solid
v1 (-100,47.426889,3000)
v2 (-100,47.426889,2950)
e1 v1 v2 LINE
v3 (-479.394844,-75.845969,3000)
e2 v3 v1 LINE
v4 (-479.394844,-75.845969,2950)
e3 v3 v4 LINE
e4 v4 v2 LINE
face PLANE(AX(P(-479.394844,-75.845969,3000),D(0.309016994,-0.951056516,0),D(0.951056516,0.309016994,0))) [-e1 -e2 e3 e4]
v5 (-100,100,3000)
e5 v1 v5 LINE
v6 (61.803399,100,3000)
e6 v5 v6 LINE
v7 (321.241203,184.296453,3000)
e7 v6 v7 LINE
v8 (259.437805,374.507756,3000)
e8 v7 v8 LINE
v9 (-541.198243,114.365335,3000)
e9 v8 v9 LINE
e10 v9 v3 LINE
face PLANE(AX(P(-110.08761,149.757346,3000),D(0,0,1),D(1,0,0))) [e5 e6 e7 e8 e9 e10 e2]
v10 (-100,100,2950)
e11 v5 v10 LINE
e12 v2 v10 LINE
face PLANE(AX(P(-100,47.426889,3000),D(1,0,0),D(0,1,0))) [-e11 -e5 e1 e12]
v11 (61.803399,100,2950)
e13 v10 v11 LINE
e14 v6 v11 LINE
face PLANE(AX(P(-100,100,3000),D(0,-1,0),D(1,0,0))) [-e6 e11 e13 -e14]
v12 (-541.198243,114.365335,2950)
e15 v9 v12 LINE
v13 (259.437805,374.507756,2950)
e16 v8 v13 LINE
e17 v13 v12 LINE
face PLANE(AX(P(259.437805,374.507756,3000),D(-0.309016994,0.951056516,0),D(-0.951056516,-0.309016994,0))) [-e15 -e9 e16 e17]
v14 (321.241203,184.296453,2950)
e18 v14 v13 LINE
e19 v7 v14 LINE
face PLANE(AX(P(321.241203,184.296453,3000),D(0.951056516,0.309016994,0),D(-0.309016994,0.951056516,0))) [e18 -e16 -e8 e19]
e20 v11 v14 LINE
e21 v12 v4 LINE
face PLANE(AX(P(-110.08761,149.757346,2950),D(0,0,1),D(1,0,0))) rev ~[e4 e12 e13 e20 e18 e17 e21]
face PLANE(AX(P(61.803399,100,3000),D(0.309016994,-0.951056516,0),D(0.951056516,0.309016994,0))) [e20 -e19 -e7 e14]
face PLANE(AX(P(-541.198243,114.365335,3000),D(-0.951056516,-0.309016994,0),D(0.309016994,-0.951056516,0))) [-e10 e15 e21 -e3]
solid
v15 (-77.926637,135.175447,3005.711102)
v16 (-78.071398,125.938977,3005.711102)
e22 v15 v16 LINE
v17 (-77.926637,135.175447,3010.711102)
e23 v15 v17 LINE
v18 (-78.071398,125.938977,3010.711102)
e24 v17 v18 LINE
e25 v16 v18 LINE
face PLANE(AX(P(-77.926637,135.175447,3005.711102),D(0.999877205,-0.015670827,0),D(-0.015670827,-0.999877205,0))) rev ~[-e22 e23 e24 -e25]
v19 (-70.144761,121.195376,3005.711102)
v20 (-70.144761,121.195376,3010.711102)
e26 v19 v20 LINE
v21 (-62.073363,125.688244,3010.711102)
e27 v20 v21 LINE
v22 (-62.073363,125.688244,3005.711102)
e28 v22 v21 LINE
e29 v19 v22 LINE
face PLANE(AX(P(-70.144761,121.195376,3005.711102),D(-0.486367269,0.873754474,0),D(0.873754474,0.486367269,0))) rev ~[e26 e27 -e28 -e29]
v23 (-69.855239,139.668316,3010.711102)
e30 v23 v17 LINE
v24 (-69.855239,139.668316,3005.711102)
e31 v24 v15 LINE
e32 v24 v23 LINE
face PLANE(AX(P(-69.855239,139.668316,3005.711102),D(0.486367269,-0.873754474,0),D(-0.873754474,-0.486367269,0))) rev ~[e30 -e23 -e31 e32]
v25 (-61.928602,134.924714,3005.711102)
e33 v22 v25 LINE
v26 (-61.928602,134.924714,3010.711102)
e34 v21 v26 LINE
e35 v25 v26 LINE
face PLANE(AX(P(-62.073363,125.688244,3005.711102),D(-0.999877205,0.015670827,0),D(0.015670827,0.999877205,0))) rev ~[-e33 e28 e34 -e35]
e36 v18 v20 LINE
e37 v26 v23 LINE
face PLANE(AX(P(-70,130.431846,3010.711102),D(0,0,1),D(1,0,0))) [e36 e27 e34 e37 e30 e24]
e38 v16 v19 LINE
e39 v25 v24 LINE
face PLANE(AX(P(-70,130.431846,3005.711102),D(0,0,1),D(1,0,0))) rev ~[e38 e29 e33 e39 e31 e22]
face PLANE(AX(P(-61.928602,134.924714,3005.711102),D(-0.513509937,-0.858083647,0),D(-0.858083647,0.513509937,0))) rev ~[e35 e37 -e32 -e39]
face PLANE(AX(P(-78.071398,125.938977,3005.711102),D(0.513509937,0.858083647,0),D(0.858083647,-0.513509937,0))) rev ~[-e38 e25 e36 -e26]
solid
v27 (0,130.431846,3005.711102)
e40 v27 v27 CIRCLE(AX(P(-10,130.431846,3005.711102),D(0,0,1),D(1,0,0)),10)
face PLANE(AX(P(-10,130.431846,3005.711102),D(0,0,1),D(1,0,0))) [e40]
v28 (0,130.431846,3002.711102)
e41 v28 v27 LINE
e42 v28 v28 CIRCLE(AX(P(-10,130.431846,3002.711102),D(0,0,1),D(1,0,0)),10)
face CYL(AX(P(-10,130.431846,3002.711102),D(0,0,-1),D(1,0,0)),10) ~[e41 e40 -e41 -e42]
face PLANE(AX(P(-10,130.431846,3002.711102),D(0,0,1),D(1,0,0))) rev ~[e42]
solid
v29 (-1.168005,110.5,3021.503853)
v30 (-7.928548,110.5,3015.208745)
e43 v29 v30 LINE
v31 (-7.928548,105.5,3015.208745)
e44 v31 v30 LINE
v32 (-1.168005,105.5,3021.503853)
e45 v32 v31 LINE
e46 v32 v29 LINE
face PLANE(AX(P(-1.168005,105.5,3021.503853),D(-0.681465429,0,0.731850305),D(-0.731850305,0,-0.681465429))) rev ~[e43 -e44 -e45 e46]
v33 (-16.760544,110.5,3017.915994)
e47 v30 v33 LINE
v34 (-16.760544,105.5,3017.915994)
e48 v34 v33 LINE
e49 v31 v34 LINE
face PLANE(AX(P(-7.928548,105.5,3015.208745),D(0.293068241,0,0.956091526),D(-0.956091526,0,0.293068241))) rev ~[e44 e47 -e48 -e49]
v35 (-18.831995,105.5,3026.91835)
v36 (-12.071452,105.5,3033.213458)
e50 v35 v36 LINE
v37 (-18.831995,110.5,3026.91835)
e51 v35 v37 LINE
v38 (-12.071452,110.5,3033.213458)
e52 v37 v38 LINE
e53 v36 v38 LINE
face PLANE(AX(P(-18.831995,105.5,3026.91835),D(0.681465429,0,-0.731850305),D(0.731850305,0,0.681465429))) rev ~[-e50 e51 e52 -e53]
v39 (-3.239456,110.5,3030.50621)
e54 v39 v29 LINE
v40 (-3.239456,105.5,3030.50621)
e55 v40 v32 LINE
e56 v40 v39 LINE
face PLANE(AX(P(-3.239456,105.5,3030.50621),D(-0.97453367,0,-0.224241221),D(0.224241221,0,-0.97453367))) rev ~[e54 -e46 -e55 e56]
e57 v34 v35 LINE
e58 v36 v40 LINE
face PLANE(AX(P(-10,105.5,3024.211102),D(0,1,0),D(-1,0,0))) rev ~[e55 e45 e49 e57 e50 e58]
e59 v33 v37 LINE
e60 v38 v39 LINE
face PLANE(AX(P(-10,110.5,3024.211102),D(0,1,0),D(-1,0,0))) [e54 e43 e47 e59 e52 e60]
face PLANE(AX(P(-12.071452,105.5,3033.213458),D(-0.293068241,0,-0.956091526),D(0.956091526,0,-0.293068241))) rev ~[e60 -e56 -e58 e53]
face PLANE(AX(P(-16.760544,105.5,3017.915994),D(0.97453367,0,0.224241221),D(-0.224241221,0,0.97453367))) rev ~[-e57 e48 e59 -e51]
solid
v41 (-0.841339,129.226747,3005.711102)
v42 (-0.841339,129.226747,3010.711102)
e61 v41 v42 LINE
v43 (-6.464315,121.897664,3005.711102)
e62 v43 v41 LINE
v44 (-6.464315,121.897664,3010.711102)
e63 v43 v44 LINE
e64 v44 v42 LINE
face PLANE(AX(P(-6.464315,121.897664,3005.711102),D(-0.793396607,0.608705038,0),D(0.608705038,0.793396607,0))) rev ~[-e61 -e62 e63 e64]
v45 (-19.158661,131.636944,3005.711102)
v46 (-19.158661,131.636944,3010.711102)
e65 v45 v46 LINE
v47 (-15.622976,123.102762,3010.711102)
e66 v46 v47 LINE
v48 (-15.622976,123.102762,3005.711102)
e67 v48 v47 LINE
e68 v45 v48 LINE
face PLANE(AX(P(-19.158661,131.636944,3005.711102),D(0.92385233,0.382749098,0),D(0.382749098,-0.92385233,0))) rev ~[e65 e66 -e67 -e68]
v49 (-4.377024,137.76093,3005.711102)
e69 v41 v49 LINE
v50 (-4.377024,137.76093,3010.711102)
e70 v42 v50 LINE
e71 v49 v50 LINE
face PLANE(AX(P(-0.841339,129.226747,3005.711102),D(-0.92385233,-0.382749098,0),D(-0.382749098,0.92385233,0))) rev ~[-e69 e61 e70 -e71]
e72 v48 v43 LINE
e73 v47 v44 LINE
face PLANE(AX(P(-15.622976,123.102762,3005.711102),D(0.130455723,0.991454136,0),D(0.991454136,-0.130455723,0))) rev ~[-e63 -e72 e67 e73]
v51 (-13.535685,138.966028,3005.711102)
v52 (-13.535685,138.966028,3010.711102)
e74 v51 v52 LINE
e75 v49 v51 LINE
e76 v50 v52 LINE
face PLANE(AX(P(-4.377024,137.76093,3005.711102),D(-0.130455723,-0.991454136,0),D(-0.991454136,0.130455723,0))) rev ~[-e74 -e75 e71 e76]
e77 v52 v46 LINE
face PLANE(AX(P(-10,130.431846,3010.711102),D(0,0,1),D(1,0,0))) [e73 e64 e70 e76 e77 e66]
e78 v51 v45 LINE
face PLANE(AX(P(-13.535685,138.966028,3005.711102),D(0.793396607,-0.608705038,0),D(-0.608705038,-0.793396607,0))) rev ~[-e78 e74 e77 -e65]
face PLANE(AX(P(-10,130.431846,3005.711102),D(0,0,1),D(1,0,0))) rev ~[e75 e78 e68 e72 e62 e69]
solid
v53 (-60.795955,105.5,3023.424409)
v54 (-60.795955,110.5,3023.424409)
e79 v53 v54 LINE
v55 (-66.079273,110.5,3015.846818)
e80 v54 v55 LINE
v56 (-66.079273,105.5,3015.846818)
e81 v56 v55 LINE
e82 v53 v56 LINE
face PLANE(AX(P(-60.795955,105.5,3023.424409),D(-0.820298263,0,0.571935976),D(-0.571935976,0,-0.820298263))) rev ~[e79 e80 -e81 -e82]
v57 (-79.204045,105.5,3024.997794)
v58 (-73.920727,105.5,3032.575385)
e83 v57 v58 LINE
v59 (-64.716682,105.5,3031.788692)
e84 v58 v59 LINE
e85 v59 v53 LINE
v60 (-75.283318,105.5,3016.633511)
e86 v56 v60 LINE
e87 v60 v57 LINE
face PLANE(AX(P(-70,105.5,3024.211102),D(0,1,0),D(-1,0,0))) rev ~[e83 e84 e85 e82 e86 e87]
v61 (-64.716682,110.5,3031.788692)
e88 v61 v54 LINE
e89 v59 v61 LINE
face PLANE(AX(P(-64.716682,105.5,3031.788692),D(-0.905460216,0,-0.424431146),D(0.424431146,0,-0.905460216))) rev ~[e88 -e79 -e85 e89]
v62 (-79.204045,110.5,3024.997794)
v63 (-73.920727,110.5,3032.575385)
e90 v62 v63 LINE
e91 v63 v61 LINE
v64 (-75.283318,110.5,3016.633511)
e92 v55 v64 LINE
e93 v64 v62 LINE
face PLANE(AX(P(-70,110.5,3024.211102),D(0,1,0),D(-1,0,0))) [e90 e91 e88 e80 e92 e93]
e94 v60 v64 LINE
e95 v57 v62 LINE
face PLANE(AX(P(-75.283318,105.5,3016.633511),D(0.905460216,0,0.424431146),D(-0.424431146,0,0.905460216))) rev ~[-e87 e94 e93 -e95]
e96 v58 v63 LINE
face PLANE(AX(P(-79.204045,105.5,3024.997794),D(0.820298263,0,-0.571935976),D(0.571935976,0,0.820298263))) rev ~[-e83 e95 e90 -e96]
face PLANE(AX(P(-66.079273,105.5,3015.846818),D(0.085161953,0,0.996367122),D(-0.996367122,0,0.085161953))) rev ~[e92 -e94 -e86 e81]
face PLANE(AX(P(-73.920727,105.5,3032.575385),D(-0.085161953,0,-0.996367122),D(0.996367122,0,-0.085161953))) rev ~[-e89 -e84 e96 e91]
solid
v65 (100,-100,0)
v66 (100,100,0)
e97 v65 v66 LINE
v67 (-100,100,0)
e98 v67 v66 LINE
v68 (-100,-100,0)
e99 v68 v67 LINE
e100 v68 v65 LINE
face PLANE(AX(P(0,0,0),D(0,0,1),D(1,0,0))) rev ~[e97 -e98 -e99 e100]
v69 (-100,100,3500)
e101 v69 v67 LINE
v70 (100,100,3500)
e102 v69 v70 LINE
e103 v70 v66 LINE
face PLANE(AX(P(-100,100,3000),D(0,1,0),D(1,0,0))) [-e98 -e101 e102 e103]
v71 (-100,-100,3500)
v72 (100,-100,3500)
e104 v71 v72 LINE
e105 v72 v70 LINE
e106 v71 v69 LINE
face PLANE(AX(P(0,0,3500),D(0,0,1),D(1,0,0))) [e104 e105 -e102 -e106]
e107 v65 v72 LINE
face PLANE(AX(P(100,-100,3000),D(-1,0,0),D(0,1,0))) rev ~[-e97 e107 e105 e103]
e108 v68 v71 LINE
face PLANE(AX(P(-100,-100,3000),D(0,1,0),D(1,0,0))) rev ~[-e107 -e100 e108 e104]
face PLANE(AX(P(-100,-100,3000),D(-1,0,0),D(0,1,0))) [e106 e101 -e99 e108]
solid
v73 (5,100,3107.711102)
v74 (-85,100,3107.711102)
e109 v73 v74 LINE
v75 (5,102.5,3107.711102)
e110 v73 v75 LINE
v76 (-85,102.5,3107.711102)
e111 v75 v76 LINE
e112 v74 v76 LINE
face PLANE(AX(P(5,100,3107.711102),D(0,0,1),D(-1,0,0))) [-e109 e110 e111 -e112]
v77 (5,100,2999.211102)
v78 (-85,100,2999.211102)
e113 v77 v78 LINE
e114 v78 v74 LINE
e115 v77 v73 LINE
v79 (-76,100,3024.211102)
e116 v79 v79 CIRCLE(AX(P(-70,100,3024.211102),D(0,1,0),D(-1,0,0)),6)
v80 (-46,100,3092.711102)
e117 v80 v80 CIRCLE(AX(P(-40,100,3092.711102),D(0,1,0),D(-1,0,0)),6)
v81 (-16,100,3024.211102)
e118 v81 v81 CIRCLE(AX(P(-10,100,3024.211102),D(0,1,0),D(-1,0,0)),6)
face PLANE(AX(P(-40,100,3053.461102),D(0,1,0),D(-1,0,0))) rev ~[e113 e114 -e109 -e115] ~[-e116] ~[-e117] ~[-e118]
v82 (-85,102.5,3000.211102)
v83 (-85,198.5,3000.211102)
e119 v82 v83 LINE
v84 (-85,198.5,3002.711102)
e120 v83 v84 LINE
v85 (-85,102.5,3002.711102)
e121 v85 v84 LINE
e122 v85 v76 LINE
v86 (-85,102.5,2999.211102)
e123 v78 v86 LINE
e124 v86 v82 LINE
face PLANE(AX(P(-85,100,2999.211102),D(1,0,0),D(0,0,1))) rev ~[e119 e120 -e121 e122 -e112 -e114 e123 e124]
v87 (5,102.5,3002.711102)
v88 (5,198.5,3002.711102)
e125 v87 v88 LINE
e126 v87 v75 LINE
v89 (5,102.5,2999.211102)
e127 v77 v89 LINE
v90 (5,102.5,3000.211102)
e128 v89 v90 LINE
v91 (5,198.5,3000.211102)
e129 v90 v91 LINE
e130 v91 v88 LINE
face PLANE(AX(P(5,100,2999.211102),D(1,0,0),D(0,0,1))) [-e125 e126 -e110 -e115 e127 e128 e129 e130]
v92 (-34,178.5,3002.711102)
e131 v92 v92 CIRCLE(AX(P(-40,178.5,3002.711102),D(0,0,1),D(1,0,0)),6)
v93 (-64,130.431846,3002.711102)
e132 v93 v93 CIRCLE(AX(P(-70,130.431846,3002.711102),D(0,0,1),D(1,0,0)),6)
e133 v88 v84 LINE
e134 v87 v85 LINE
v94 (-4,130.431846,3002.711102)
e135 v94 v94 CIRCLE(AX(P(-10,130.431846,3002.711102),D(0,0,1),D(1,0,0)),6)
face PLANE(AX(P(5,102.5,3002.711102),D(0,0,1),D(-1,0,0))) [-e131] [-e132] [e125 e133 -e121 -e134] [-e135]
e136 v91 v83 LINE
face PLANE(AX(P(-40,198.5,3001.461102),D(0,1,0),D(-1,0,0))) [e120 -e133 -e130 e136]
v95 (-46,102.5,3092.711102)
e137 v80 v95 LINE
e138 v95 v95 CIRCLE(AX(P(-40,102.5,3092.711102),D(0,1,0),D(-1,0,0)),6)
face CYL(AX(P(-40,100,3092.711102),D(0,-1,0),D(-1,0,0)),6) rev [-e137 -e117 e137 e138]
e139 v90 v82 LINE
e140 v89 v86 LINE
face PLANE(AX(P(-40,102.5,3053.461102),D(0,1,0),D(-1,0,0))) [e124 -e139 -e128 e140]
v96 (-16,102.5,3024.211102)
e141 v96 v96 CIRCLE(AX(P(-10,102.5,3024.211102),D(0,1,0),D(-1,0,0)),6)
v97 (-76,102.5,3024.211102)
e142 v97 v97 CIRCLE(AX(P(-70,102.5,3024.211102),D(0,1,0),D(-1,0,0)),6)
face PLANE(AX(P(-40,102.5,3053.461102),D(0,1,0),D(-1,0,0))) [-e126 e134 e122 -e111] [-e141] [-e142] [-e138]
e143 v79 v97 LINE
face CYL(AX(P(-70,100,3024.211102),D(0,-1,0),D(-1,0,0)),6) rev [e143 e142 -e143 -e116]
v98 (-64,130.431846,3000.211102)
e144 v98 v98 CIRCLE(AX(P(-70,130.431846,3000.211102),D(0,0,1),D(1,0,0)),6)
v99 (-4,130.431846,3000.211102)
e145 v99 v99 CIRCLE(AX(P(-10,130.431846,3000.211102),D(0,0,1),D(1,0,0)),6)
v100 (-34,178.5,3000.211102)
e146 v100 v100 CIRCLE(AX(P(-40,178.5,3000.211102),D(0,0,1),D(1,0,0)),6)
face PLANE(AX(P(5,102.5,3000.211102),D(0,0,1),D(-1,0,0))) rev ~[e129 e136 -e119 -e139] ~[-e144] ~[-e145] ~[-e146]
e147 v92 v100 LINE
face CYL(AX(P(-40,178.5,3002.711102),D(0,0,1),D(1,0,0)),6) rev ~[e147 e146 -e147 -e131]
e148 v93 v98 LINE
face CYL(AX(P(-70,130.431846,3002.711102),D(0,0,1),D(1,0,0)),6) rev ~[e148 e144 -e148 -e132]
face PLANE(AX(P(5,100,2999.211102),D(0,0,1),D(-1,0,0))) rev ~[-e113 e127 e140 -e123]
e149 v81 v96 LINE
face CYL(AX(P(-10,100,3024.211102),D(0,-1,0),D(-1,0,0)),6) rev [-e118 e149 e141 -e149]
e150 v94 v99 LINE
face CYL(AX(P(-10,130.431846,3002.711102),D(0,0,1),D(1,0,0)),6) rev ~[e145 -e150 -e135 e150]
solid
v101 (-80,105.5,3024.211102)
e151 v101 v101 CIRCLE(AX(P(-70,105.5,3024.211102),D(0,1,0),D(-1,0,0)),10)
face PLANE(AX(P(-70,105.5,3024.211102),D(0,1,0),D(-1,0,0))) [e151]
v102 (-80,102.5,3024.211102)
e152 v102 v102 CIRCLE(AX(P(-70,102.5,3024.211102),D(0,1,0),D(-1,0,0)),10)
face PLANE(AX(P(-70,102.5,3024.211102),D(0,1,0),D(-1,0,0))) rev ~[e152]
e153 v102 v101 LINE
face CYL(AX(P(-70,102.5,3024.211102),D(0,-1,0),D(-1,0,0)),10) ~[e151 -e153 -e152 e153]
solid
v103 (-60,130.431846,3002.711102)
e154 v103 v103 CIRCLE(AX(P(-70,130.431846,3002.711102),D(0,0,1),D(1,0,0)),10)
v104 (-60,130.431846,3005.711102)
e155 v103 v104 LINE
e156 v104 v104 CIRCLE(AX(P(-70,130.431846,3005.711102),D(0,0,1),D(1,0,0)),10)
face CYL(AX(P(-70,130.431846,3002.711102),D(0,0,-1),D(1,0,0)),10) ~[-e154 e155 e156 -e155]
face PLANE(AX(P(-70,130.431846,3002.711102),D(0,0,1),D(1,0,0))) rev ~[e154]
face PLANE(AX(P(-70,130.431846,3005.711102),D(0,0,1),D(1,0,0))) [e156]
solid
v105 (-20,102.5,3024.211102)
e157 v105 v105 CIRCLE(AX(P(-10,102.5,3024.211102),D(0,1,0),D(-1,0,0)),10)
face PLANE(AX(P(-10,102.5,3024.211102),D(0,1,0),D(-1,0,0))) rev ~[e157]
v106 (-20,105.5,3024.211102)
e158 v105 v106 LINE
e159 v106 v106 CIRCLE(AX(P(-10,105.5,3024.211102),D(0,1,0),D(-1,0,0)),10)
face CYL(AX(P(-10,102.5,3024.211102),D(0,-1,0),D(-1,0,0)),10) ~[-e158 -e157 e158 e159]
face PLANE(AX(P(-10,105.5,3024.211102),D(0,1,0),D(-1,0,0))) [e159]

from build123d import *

# Parameters (mm, degrees)
F0_W      = 200
F0_H      = 200
F1_DEPTH  = 3000
F3_DEPTH  = 50
F4_DEPTH  = 500
F5_W      = 90
F5_H      = 108.5
F5_R      = 6
F6_DEPTH  = 2.5
F7_W      = 90
F7_H      = 2.5
F8_DEPTH  = 96
F9_R      = 6
F10_DEPTH = 25
F11_R     = 10
F12_DEPTH = 3
F14_DEPTH = 5
F15_R     = 10
F16_DEPTH = 3
F18_DEPTH = 5
F20_DEPTH = 5
F22_DEPTH = 5


with BuildPart() as f1:
    # F0 (on Top) → F1 (new body)
    with BuildSketch(Plane.XY):
        Rectangle(F0_W, F0_H)
    extrude(amount=F1_DEPTH)

    # F4 (add): a face of the model
    f4_faces = [f1.faces().sort_by_distance(p)[0] for p in [
        (0, 0, 3000),
    ]]
    extrude(f4_faces, amount=F4_DEPTH)


with BuildPart() as f3:
    # F2 (on face) → F3 (new body)
    with BuildSketch(Plane.XY.offset(3000)):
        Polygon((-541.1982426134, 114.3653346673), (-479.3948437385, -75.8459685917), (-100, 47.4268887881), (-100, 100), (61.803398875, 100), (321.2412034368, 184.2964526496), (259.4378045618, 374.5077559086), align=None)
    extrude(amount=-F3_DEPTH)


with BuildPart() as f6:
    # F5 (on face) → F6 (new body)
    with BuildSketch(Plane(origin=(0, 100, 0), x_dir=(-1, 0, 0), z_dir=(0, 1, 0))):
        with Locations((40, 3053.461101532)):
            Rectangle(F5_W, F5_H)
        with Locations((10, 3024.211101532)):
            Circle(F5_R, mode=Mode.SUBTRACT)
        with Locations((70, 3024.211101532)):
            Circle(F5_R, mode=Mode.SUBTRACT)
        with Locations((40, 3092.711101532)):
            Circle(F5_R, mode=Mode.SUBTRACT)
    extrude(amount=F6_DEPTH)

    # F7 (on face) → F8 (join)
    with BuildSketch(Plane(origin=(0, 102.5, 0), x_dir=(-1, 0, 0), z_dir=(0, 1, 0))):
        with Locations((40, 3001.461101532)):
            Rectangle(F7_W, F7_H)
    extrude(amount=F8_DEPTH)

    # F9 (on face) → F10 (cut)
    with BuildSketch(Plane.XY.offset(3002.711101532)):
        with Locations((-70, 130.4318457842)):
            Circle(F9_R)
        with Locations((-10, 130.4318457842)):
            Circle(F9_R)
        with Locations((-40, 178.5)):
            Circle(F9_R)
    extrude(amount=-F10_DEPTH, mode=Mode.SUBTRACT)


with BuildPart() as f12:
    # F11 (on face) → F12 (new body)
    with BuildSketch(Plane(origin=(0, 102.5, 0), x_dir=(-1, 0, 0), z_dir=(0, 1, 0))):
        with Locations((10, 3024.211101532)):
            Circle(F11_R)
    extrude(amount=F12_DEPTH)


with BuildPart() as f12b:
    # F11 (on face) → F12, piece 2 (new body)
    with BuildSketch(Plane(origin=(0, 102.5, 0), x_dir=(-1, 0, 0), z_dir=(0, 1, 0))):
        with Locations((70, 3024.211101532)):
            Circle(F11_R)
    extrude(amount=F12_DEPTH)


with BuildPart() as f14:
    # F13 (on face) → F14 (new body)
    with BuildSketch(Plane(origin=(0, 105.5, 0), x_dir=(-1, 0, 0), z_dir=(0, 1, 0))):
        Polygon((18.831995198, 3026.9183499794), (12.0714516691, 3033.2134579633), (3.2394564712, 3030.5062095158), (1.168004802, 3021.5038530845), (7.9285483309, 3015.2087451007), (16.7605435288, 3017.9159935482), align=None)
    extrude(amount=F14_DEPTH)


with BuildPart() as f16:
    # F15 (on face) → F16 (new body)
    with BuildSketch(Plane.XY.offset(3002.711101532)):
        with Locations((-10, 130.4318457842)):
            Circle(F15_R)
    extrude(amount=F16_DEPTH)


with BuildPart() as f16b:
    # F15 (on face) → F16, piece 2 (new body)
    with BuildSketch(Plane.XY.offset(3002.711101532)):
        with Locations((-70, 130.4318457842)):
            Circle(F15_R)
    extrude(amount=F16_DEPTH)


with BuildPart() as f18:
    # F17 (on face) → F18 (new body)
    with BuildSketch(Plane.XY.offset(3005.711101532)):
        Polygon((-69.8552391039, 139.6683157601), (-77.9266371924, 135.1754473857), (-78.0713980885, 125.9389774097), (-70.1447608961, 121.1953758083), (-62.0733628076, 125.6882441827), (-61.9286019115, 134.9247141586), align=None)
    extrude(amount=F18_DEPTH)


with BuildPart() as f20:
    # F19 (on face) → F20 (new body)
    with BuildSketch(Plane.XY.offset(3005.711101532)):
        Polygon((-13.5356847146, 138.9660280492), (-19.1586609993, 131.6369441341), (-15.6229762847, 123.1027618691), (-6.4643152854, 121.8976635192), (-0.8413390007, 129.2267474343), (-4.3770237153, 137.7609296993), align=None)
    extrude(amount=F20_DEPTH)


with BuildPart() as f22:
    # F21 (on face) → F22 (new body)
    with BuildSketch(Plane(origin=(0, 105.5, 0), x_dir=(-1, 0, 0), z_dir=(0, 1, 0))):
        Polygon((64.716681768, 3031.7886922964), (60.7959547825, 3023.424409109), (66.0792730145, 3015.8468183446), (75.283318232, 3016.6335107676), (79.2040452175, 3024.9977939549), (73.9207269855, 3032.5753847194), align=None)
    extrude(amount=F22_DEPTH)


solid = Compound([f1.part, f3.part, f6.part, f12.part, f12b.part, f14.part, f16.part, f16b.part, f18.part, f20.part, f22.part])
